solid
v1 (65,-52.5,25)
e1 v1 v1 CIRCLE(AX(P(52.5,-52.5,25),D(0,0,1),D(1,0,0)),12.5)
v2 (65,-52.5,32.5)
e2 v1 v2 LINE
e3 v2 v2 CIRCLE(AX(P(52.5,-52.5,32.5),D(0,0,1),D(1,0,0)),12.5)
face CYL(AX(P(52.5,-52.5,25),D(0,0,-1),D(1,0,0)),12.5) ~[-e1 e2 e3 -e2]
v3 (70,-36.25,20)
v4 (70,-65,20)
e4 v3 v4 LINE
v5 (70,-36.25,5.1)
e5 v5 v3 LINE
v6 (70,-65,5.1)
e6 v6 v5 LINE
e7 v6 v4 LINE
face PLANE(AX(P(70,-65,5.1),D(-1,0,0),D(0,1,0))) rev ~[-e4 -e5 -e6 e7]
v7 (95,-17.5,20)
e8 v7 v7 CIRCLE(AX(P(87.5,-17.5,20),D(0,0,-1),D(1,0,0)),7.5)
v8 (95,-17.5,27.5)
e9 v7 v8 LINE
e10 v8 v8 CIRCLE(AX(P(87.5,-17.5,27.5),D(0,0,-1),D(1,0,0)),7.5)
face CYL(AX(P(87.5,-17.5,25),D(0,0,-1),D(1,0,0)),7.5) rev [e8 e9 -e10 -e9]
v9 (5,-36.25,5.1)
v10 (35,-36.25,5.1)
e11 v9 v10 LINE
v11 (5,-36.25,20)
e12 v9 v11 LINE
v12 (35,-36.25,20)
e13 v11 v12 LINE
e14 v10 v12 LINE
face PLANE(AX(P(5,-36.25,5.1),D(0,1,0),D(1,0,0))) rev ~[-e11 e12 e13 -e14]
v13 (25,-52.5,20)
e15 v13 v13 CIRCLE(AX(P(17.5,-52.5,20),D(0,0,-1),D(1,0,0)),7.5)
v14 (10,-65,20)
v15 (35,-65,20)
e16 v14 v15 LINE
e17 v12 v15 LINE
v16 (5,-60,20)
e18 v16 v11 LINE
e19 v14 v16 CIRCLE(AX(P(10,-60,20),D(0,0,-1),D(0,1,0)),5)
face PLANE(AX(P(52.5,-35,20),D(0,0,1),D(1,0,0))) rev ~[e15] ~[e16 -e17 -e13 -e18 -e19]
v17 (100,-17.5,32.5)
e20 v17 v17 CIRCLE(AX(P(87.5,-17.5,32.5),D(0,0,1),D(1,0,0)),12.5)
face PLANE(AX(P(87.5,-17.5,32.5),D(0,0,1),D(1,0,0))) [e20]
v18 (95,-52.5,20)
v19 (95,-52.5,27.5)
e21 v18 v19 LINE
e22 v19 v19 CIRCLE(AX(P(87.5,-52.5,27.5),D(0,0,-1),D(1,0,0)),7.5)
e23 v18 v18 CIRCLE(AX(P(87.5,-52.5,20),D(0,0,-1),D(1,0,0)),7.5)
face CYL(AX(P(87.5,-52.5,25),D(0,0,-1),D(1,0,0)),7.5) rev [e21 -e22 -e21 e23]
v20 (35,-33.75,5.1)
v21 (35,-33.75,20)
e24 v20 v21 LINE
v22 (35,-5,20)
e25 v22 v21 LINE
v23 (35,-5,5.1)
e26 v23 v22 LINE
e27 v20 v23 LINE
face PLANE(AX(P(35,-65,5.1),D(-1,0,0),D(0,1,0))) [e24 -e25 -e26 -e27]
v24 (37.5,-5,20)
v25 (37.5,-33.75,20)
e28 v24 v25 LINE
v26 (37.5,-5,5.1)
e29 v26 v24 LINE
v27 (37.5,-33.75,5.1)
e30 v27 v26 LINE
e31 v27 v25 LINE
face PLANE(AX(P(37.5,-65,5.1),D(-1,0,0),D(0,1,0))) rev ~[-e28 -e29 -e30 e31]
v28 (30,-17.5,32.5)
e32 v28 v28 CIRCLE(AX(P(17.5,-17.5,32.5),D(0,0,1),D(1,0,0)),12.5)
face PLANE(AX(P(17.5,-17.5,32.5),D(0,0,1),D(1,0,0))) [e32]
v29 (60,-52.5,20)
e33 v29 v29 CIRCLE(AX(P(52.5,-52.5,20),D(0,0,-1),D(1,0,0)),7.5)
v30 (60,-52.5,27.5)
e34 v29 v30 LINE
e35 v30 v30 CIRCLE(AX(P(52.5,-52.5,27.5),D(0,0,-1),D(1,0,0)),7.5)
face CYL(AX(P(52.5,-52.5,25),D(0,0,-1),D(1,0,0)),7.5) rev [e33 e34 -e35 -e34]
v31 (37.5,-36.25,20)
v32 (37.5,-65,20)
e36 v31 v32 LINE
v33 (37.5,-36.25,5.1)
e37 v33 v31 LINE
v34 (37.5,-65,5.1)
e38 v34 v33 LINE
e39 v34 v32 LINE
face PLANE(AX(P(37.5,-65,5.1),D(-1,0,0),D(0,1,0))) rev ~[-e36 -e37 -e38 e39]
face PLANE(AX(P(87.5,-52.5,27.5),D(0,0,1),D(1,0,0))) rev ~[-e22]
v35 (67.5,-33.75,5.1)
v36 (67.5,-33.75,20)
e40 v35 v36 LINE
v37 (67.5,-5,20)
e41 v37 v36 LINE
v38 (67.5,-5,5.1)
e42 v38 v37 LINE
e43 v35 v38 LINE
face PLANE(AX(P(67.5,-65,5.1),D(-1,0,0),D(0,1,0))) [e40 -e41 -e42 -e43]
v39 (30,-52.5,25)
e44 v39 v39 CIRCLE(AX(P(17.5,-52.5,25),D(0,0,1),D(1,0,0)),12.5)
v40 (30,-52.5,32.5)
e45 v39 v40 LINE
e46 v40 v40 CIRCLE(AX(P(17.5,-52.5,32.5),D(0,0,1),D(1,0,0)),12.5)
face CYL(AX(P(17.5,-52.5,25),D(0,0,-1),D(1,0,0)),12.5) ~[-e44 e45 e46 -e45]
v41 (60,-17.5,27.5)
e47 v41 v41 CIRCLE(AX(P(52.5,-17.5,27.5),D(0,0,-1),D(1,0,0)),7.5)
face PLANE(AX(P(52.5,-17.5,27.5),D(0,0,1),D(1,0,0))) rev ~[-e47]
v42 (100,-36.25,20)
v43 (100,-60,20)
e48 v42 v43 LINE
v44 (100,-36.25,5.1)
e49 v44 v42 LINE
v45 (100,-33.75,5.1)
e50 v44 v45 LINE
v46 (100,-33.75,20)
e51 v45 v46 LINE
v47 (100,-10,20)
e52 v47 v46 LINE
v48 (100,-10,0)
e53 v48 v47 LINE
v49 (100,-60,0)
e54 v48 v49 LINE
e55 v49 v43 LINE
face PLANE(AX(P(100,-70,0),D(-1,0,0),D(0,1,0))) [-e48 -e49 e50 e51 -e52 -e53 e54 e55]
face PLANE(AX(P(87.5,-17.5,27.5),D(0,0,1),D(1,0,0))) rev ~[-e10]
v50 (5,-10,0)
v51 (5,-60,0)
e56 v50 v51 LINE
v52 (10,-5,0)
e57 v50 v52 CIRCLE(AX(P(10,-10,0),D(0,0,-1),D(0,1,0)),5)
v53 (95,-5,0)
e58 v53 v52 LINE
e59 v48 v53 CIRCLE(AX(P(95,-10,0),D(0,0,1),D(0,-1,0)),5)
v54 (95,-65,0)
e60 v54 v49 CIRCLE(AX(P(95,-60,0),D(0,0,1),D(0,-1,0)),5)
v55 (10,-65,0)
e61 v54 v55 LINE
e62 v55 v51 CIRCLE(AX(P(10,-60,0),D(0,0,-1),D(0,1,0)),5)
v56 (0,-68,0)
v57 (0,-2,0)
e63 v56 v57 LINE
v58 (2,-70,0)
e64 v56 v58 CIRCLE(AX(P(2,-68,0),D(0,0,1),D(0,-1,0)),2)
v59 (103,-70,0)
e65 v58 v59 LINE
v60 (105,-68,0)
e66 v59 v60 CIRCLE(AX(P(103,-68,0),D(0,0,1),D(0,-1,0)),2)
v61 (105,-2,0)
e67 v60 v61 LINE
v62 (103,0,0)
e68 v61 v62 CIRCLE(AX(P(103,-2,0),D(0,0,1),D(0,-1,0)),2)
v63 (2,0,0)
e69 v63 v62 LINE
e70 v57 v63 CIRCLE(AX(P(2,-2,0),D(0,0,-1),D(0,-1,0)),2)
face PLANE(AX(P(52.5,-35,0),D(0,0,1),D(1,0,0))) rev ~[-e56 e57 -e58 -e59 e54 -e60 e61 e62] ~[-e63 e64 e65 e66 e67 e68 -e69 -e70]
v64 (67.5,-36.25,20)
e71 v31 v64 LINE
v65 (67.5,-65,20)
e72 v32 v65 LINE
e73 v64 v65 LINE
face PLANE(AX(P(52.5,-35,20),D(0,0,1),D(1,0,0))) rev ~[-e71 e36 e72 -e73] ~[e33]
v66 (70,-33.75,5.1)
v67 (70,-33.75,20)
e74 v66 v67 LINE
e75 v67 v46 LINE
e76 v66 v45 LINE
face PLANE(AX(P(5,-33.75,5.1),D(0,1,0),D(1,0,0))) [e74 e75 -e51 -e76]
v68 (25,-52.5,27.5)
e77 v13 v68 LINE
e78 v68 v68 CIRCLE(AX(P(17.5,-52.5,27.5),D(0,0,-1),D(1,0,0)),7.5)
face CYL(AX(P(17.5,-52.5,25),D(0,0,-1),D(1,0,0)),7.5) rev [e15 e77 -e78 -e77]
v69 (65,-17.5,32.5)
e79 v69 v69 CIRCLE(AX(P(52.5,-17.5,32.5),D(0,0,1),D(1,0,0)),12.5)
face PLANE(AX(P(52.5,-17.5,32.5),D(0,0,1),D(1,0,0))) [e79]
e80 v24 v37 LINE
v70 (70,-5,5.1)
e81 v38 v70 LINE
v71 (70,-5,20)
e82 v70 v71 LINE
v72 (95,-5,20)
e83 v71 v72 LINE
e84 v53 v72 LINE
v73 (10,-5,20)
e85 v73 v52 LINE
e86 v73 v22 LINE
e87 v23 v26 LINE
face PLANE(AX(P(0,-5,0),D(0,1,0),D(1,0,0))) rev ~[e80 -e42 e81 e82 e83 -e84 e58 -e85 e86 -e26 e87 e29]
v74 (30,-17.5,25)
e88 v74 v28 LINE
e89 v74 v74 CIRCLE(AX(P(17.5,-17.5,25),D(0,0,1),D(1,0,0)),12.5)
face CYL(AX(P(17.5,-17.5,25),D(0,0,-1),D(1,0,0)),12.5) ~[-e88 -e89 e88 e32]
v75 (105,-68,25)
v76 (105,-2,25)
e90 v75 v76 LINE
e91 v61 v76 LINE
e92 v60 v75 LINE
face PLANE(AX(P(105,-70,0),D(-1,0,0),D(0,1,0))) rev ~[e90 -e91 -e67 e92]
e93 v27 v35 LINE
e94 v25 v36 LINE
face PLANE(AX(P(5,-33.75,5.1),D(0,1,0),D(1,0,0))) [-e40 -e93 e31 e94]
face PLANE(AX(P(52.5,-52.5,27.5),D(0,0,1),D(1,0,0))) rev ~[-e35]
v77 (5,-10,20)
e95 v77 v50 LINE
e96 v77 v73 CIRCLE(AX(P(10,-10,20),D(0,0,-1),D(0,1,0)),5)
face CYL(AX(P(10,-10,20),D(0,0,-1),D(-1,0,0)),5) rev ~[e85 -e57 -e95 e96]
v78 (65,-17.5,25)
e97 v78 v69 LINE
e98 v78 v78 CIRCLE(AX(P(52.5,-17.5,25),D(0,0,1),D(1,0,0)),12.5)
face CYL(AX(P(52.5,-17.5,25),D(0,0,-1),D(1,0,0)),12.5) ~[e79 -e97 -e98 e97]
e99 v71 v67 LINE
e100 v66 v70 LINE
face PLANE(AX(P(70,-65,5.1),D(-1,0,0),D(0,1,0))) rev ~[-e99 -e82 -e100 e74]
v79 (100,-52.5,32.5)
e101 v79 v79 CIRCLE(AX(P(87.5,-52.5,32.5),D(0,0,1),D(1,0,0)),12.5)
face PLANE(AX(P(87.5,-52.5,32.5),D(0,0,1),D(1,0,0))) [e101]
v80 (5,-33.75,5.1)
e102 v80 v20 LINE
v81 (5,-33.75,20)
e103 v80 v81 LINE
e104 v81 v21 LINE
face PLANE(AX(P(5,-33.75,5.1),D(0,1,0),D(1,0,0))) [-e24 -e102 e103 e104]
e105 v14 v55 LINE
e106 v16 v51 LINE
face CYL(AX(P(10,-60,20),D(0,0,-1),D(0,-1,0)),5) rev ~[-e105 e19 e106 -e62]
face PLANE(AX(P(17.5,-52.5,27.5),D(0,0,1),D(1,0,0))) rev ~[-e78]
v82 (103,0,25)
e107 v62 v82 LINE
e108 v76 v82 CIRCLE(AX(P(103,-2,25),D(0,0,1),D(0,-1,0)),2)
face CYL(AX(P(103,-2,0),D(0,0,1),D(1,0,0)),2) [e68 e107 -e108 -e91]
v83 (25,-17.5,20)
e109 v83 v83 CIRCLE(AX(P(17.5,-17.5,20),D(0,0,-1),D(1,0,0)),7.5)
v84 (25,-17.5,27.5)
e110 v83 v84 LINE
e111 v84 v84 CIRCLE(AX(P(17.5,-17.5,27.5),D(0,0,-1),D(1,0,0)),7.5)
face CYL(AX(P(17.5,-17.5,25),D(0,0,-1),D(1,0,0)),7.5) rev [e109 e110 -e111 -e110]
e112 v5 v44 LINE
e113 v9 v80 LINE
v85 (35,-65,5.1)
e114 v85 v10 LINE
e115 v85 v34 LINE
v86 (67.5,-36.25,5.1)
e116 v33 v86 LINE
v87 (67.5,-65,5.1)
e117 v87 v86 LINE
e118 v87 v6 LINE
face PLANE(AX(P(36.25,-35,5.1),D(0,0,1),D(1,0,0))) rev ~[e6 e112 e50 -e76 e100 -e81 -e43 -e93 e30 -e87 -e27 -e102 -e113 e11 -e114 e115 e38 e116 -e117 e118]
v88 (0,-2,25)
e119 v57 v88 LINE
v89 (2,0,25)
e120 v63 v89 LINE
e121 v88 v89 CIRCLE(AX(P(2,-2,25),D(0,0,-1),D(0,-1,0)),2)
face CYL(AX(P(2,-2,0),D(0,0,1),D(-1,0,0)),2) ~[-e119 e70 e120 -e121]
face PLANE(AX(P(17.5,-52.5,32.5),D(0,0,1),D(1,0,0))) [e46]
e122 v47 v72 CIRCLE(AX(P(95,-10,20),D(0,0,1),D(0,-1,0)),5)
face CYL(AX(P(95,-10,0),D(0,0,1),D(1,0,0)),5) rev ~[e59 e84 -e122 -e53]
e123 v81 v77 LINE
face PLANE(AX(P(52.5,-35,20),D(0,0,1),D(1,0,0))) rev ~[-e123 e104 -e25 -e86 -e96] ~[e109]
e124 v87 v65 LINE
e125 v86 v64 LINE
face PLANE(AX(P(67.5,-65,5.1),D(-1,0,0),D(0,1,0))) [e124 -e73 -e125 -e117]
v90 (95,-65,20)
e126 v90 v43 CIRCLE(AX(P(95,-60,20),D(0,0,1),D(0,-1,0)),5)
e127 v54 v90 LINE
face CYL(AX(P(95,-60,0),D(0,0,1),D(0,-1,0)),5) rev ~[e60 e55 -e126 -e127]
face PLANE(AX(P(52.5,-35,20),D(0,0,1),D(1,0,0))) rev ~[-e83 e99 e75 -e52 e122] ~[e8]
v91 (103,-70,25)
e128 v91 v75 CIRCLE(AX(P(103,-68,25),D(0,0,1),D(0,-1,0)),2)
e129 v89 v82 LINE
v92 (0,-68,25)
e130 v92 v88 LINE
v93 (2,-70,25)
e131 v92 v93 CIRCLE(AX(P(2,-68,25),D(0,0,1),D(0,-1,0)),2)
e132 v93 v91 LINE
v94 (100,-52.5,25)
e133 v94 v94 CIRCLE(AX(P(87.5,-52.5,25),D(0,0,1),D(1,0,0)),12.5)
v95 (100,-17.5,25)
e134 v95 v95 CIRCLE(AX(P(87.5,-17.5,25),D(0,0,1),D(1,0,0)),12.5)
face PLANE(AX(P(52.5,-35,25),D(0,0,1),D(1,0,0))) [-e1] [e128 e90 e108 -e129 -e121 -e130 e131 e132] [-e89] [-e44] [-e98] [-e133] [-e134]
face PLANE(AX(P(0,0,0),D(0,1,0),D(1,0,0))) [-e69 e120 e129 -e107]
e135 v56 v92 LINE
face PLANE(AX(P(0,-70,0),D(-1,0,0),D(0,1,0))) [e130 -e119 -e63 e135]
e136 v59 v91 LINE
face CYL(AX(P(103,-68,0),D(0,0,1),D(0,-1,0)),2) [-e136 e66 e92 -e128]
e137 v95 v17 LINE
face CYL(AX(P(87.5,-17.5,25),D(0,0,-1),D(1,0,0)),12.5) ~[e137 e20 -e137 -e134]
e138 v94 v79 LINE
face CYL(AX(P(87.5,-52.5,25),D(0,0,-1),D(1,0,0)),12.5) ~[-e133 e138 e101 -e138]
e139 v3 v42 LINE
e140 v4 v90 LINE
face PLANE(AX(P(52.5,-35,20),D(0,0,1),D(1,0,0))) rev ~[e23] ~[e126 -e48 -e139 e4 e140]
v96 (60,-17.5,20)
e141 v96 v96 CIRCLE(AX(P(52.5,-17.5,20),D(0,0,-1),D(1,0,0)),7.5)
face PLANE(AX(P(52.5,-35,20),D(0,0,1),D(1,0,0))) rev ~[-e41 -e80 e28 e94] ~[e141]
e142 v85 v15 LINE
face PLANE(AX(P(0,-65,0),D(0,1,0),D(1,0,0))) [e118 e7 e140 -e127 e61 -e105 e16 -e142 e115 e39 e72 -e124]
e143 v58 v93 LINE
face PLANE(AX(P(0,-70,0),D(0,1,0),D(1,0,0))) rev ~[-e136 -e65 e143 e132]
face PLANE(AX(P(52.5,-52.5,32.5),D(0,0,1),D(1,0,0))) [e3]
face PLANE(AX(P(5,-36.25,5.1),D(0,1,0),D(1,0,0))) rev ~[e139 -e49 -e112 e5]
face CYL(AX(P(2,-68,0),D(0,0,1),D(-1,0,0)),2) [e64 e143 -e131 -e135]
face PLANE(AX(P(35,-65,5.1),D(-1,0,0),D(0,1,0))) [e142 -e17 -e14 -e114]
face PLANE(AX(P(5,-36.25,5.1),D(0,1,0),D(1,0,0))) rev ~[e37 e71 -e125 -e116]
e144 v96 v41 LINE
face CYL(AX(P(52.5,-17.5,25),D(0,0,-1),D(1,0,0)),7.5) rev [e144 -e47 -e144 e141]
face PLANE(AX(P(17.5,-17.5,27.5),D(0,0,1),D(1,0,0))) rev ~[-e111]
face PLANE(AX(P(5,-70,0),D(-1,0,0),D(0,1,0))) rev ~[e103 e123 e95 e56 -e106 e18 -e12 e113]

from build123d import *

# Parameters (mm, degrees)
F0_W     = 105
F0_H     = 70
F1_DEPTH = 25
F2_R     = 12.5
F3_DEPTH = 7.5
F4_T     = -5
F6_W     = 95
F6_H     = 2.5
F7_DEPTH = 14.9
F8_W     = 2.5
F8_H     = 60
F9_DEPTH = 19.9
F10_R    = 5
F11_R    = 2


# Not quite as in the source:
# - an extrude ends at something that could not be found from the text; its depth is read off the source's solid


with BuildPart() as f1:
    # F0 (on Top) → F1 (new body)
    with BuildSketch(Plane.XY):
        with Locations((52.5, -35)):
            Rectangle(F0_W, F0_H)
    extrude(amount=F1_DEPTH)

    # F2 (on face) → F3 (join)
    with BuildSketch(Plane.XY.offset(25)):
        with Locations((17.5, -17.5)):
            Circle(F2_R)
        with Locations((52.5, -17.5)):
            Circle(F2_R)
        with Locations((87.5, -17.5)):
            Circle(F2_R)
        with Locations((17.5, -52.5)):
            Circle(F2_R)
        with Locations((52.5, -52.5)):
            Circle(F2_R)
        with Locations((87.5, -52.5)):
            Circle(F2_R)
    extrude(amount=F3_DEPTH)

    # F4
    f4_openings = [f1.faces().sort_by_distance(p)[0] for p in [
        (52.5, -35, 0),
    ]]
    offset(amount=F4_T, openings=f4_openings, kind=Kind.INTERSECTION)

    # F6 (on offset) → F7 (join, through all)
    with BuildSketch(Plane.XY.offset(5.1)):
        with Locations((52.5, -35)):
            Rectangle(F6_W, F6_H)
    extrude(amount=F7_DEPTH)

    # F8 (on offset) → F9 (join, through all)
    with BuildSketch(Plane.XY.offset(5.1)):
        with Locations((36.25, -35)):
            Rectangle(F8_W, F8_H)
        with Locations((68.75, -35)):
            Rectangle(F8_W, F8_H)
    extrude(amount=F9_DEPTH)

    # F10
    f10_edges = [f1.edges().sort_by_distance(p)[0] for p in [
        (5, -65, 10),
        (5, -5, 10),
        (100, -65, 10),
        (100, -5, 10),
    ]]
    fillet(f10_edges, radius=F10_R)

    # F11
    f11_edges = [f1.edges().sort_by_distance(p)[0] for p in [
        (105, -70, 12.5),
        (0, -70, 12.5),
        (0, 0, 12.5),
        (105, 0, 12.5),
    ]]
    fillet(f11_edges, radius=F11_R)


solid = f1.part
